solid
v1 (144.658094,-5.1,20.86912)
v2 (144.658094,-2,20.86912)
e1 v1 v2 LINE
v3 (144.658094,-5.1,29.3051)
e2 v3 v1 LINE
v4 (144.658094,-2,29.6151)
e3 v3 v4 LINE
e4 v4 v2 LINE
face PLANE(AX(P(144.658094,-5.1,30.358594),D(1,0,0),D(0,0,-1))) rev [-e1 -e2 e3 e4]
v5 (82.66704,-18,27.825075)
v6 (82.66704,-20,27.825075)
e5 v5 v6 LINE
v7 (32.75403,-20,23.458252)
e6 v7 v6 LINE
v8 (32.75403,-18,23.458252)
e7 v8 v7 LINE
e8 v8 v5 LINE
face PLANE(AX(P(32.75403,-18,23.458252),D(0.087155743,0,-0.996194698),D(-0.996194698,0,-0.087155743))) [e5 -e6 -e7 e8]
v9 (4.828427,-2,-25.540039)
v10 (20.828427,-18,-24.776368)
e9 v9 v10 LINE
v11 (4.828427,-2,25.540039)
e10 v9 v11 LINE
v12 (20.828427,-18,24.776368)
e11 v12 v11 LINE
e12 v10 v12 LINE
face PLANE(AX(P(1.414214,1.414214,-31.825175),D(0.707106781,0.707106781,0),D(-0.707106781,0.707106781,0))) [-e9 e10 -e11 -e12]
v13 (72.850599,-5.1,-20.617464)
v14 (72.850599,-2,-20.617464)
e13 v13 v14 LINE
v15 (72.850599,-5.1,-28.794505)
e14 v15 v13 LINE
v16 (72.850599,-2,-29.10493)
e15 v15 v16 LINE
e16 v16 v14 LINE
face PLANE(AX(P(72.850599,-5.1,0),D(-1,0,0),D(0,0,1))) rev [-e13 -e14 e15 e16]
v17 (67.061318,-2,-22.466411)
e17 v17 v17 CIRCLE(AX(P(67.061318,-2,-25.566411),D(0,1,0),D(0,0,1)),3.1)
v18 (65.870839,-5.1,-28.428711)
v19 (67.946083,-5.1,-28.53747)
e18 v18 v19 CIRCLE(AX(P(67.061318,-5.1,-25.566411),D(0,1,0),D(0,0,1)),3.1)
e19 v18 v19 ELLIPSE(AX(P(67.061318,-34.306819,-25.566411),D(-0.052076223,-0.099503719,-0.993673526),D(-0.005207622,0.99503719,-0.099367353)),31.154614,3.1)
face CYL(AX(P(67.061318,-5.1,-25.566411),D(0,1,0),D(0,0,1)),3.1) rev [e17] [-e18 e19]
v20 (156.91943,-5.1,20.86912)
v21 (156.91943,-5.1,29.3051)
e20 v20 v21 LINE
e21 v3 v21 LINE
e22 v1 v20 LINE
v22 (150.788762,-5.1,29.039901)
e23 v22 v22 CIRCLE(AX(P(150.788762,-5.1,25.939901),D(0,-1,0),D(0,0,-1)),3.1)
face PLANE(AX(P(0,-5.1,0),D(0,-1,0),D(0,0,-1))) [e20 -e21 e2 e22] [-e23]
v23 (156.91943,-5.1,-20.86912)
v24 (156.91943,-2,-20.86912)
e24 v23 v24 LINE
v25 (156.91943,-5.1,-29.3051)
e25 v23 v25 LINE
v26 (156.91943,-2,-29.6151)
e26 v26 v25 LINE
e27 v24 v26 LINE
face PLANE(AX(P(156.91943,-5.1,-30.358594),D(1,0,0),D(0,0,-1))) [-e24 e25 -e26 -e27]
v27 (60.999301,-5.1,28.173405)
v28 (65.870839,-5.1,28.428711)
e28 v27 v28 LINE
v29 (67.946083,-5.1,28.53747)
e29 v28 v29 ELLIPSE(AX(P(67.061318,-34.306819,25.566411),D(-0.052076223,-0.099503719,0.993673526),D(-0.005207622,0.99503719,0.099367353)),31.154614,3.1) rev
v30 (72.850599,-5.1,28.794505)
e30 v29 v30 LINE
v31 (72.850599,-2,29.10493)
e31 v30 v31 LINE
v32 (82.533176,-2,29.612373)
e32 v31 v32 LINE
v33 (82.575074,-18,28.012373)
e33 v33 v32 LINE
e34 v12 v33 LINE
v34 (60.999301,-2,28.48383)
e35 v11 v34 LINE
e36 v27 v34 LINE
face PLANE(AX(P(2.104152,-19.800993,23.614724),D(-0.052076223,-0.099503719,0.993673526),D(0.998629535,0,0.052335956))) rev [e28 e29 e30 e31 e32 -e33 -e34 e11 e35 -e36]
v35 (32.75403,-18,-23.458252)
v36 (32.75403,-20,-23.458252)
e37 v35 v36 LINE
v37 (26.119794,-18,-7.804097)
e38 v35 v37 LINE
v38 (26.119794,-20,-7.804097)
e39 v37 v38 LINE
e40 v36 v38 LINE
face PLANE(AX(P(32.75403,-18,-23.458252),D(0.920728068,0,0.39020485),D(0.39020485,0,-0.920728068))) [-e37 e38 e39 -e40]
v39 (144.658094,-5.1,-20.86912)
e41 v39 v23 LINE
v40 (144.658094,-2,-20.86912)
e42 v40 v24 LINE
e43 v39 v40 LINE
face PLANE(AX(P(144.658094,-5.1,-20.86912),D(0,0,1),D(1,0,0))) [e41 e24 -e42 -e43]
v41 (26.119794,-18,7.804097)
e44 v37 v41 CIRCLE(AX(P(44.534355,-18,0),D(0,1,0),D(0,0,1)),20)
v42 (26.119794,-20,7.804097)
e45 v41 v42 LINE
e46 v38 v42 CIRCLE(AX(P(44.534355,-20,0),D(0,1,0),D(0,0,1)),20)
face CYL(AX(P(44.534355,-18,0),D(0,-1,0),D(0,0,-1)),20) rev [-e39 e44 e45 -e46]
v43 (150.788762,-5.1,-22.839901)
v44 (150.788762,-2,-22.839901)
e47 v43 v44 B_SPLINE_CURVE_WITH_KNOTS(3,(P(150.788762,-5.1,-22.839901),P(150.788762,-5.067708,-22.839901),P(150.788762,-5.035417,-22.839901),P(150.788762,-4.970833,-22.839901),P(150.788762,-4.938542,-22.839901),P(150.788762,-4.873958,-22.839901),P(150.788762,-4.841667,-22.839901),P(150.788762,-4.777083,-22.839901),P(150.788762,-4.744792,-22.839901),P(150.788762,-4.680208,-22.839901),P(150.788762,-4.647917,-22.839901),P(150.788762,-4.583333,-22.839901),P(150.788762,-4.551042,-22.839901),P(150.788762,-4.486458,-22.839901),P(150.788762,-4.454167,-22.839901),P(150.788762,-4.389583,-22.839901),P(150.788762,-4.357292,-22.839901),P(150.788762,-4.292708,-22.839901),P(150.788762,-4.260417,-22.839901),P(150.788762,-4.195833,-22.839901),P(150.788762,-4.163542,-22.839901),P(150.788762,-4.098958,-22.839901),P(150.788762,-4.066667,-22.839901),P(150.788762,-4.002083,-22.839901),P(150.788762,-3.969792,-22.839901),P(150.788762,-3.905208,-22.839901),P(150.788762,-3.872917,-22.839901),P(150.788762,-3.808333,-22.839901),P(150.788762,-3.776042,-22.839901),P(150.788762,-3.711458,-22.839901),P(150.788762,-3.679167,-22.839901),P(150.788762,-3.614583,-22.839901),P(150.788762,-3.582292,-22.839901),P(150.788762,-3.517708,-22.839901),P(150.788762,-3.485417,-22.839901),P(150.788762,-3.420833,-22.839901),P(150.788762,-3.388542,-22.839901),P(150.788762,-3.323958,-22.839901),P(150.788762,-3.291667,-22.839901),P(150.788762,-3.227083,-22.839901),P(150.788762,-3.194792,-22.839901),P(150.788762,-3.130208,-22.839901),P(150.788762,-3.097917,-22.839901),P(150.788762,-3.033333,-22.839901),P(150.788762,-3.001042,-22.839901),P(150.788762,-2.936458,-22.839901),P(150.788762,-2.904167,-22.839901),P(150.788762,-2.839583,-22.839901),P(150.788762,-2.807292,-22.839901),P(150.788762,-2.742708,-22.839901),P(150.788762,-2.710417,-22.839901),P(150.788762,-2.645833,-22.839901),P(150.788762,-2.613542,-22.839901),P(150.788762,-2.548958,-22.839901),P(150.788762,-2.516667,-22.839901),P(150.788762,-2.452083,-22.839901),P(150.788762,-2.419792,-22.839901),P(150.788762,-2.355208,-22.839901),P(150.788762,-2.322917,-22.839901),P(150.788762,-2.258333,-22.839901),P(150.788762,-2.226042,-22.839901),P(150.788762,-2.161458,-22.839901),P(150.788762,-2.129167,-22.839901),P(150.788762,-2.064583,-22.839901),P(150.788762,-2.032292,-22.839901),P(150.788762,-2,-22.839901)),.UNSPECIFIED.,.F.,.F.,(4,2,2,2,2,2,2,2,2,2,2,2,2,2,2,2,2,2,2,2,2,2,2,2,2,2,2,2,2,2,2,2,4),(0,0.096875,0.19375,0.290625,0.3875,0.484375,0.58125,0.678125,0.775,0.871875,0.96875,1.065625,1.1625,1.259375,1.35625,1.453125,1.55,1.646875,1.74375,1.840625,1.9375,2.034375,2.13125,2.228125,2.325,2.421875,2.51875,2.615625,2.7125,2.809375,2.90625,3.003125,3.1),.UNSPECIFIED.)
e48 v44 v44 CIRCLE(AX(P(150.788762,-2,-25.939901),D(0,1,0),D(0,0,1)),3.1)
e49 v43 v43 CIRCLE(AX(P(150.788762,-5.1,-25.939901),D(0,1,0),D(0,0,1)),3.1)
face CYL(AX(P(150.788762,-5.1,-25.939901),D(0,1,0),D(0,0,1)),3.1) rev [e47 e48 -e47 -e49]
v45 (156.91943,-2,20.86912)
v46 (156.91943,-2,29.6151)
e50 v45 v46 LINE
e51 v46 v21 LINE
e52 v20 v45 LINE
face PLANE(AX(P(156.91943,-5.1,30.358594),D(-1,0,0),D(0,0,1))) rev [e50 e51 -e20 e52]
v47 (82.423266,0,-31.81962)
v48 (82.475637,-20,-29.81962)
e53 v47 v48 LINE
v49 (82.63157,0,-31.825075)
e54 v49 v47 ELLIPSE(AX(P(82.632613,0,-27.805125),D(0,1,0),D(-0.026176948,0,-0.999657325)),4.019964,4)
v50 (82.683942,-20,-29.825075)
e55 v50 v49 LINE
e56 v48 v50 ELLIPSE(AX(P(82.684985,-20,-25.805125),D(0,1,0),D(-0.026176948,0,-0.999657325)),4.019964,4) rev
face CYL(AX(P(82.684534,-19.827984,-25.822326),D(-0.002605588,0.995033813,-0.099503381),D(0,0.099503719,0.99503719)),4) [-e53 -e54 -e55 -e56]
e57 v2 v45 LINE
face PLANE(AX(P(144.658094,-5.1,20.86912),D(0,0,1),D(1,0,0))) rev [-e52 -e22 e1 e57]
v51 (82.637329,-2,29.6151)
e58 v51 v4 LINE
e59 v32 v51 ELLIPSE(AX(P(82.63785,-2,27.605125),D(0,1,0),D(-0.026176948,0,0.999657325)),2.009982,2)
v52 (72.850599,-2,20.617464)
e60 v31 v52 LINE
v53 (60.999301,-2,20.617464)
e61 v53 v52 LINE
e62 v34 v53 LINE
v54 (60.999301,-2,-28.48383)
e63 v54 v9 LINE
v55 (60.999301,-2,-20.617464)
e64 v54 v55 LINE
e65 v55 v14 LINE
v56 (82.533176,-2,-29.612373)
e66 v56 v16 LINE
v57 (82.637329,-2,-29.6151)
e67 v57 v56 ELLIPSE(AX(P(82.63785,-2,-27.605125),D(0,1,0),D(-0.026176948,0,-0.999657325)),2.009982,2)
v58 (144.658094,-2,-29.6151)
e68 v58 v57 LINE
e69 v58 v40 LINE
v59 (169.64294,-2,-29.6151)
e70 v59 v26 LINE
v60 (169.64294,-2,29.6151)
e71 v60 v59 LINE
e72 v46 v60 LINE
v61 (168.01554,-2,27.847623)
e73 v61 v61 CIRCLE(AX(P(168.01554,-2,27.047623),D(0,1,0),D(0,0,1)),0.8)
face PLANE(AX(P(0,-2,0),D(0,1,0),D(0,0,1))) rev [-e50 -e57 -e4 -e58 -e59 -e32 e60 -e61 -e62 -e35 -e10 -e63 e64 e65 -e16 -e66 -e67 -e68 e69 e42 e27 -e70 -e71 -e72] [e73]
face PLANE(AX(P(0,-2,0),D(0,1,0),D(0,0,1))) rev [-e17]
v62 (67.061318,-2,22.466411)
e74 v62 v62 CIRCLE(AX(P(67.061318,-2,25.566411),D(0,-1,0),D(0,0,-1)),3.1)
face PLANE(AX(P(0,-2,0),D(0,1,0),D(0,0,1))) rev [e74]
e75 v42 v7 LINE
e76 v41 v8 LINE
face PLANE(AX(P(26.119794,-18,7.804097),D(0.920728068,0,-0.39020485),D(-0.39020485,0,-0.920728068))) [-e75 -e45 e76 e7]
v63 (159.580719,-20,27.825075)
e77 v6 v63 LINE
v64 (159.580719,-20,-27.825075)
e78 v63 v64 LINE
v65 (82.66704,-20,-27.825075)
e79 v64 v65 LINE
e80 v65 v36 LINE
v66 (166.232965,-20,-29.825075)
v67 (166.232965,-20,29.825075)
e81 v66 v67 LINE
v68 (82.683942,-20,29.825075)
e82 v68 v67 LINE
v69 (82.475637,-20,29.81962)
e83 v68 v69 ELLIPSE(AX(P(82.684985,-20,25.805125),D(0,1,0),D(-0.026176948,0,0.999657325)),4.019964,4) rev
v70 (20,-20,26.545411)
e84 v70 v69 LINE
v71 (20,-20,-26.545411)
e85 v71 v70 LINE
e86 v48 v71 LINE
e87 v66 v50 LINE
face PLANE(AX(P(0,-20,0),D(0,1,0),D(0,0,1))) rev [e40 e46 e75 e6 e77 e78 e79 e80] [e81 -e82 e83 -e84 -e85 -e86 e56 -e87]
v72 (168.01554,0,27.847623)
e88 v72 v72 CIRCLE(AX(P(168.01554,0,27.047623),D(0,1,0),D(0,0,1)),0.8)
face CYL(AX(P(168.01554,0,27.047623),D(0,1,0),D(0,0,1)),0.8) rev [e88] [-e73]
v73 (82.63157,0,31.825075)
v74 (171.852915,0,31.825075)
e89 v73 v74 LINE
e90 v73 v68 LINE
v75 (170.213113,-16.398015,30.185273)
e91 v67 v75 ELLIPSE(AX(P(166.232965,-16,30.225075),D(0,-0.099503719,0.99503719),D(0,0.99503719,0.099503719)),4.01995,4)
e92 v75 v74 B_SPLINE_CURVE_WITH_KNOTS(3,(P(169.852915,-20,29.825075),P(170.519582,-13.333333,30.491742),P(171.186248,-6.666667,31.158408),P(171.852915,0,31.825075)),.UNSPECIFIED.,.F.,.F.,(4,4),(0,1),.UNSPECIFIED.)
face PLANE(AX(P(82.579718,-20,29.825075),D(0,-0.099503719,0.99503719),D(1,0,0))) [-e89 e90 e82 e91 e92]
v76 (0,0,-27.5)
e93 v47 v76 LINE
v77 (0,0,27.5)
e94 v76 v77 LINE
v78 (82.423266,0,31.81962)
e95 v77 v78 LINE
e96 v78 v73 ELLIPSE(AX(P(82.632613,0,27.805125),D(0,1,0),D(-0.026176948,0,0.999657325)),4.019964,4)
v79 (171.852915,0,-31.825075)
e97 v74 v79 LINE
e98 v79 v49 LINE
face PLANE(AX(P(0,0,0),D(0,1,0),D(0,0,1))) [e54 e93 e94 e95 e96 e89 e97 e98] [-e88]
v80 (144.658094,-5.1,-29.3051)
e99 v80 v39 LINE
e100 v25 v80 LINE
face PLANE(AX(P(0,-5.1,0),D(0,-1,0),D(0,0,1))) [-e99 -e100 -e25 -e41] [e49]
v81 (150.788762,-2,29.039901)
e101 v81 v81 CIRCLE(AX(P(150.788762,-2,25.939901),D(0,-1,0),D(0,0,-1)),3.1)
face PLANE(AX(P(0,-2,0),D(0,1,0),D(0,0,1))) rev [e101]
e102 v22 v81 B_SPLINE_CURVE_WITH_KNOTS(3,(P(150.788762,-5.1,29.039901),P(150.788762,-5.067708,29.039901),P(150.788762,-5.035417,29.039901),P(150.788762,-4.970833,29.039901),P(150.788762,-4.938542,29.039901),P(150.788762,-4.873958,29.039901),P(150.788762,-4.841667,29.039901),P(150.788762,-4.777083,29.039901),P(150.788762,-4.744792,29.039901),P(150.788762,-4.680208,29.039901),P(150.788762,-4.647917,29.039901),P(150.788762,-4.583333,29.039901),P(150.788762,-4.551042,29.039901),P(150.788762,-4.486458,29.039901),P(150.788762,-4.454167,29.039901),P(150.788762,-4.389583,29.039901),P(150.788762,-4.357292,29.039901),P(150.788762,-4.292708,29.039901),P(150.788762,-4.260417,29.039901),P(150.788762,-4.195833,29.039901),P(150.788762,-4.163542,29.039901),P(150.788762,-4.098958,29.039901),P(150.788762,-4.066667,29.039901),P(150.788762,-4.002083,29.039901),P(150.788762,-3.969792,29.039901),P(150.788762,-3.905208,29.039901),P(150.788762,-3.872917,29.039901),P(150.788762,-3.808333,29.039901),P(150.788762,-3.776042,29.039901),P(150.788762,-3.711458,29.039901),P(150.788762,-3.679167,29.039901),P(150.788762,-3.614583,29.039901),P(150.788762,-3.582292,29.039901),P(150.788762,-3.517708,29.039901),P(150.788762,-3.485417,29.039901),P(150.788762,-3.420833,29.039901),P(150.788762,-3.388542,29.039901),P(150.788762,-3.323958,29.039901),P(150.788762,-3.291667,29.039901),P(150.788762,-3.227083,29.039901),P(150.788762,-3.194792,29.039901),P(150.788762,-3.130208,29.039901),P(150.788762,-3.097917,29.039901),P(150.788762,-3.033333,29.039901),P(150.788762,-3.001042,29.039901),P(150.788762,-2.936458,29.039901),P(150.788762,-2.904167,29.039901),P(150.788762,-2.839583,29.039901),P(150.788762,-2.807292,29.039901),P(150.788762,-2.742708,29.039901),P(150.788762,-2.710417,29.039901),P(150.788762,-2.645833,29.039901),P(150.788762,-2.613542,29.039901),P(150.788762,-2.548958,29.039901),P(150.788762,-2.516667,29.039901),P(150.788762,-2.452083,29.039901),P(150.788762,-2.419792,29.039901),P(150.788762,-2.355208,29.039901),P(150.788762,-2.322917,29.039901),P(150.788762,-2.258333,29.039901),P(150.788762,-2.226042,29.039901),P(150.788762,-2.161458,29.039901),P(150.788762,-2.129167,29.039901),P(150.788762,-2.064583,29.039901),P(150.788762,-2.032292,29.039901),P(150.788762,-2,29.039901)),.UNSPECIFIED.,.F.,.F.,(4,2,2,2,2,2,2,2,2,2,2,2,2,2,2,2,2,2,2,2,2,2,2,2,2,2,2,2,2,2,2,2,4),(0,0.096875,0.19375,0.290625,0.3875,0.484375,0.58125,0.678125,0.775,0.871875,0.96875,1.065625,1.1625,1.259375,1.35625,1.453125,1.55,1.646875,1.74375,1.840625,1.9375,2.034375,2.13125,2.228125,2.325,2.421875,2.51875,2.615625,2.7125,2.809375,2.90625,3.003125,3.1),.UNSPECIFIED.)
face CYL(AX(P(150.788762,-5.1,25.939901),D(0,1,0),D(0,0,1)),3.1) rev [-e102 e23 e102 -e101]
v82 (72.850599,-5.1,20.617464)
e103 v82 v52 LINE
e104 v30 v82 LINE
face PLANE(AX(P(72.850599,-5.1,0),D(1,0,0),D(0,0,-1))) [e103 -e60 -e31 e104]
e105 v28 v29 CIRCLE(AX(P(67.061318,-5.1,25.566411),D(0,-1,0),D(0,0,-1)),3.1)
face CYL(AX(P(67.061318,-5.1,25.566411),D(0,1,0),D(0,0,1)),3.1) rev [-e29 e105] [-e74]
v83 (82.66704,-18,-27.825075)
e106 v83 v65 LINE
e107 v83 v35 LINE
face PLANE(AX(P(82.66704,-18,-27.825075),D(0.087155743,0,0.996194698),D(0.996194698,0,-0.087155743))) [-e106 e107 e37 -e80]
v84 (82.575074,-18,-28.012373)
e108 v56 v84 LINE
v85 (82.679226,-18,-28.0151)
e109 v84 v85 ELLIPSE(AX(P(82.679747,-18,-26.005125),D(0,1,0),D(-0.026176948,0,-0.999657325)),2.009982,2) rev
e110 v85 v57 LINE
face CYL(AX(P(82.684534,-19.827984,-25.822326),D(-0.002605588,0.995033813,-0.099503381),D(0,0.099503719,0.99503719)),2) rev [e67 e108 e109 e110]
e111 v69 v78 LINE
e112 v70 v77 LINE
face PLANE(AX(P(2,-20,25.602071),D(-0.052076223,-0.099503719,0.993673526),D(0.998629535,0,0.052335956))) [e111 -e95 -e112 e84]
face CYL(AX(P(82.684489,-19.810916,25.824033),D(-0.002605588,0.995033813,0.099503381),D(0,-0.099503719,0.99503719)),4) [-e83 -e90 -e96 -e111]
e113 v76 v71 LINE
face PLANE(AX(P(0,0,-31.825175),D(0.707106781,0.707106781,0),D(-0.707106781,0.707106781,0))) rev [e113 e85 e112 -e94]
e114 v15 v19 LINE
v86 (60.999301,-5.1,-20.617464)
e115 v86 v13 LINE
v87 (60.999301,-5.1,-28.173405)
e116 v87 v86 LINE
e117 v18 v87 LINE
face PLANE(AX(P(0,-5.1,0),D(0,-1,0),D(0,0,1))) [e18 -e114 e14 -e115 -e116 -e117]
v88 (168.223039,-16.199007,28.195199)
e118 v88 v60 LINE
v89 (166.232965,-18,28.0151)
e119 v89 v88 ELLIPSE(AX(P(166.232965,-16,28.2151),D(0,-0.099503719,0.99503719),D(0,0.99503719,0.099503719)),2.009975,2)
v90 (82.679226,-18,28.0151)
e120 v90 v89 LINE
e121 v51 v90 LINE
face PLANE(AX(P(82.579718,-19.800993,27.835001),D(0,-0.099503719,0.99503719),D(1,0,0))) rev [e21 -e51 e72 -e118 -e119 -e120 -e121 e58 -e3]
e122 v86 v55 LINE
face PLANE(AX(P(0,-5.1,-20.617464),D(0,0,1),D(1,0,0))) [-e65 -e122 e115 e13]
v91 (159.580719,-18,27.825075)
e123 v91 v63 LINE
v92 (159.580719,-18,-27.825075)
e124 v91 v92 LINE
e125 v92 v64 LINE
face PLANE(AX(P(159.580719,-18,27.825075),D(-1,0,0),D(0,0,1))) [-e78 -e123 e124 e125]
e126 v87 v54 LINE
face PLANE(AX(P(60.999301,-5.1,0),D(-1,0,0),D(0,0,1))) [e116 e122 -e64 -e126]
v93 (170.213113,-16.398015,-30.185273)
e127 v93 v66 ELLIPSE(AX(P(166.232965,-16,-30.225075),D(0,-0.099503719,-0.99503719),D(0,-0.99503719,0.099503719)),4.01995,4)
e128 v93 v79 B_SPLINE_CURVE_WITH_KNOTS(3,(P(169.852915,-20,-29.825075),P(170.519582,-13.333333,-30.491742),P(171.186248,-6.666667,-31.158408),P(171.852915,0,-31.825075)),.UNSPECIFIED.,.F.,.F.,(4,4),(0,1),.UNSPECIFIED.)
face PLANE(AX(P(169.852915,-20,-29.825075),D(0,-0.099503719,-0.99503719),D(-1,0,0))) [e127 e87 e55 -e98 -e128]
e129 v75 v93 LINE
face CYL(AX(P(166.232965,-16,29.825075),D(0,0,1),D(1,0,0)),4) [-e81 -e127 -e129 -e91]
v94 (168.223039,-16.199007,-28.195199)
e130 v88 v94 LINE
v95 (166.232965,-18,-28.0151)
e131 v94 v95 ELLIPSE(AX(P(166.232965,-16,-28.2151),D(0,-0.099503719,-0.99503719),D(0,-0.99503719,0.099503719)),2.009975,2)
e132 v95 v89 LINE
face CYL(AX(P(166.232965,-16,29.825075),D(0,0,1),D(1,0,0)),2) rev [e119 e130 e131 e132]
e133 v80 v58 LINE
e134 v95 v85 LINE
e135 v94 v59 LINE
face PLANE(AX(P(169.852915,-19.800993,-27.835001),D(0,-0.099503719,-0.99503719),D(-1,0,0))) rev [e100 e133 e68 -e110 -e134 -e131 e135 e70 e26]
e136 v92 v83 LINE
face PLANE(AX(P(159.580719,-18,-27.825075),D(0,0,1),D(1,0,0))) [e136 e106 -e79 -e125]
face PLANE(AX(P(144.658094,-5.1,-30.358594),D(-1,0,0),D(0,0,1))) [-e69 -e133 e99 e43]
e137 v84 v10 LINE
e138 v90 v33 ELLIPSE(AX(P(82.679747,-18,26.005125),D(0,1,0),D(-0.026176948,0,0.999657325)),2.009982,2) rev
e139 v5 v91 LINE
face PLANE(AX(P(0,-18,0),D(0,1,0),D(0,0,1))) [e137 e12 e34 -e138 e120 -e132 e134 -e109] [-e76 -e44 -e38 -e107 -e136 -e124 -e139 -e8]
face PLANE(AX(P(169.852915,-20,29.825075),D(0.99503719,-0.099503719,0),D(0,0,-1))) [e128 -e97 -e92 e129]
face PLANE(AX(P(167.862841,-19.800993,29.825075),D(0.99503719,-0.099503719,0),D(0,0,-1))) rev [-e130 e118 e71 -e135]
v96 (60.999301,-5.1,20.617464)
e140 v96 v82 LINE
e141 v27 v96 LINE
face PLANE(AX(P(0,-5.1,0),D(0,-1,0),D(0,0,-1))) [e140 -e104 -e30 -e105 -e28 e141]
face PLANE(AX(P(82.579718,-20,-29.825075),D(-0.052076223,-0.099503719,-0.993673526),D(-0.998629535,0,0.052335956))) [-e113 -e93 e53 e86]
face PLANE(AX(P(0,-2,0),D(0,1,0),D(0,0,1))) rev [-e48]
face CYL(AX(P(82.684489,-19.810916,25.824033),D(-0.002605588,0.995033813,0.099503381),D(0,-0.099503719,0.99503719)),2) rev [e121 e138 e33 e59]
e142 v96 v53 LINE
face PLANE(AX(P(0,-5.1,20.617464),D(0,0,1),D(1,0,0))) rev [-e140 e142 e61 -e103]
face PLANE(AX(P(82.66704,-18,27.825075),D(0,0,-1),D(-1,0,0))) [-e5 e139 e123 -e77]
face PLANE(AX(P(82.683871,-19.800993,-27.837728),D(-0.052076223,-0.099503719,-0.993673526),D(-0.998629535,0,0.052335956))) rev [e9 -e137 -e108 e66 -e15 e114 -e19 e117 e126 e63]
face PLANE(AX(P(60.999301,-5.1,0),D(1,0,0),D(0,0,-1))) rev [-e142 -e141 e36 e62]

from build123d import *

# Parameters (mm, degrees)
LOFT_2_DEPTH             = 20
LOFT_2_DRAFT             = -5.7105931
CUT_EXTRUDE_8_DEPTH      = 176.915490387
CUT_EXTRUDE_8_DEPTH_BACK = 176.915490387
FILLET_1_R               = 4
SHELL_1_T                = 2
CUT_EXTRUDE_9_DEPTH      = 2
SKETCH_15_R              = 3.1
EXTRUDE_2_DEPTH          = 3.1
SKETCH_16_W              = 12.261336097
SKETCH_16_H              = 9.48947362
SKETCH_16_R              = 3.1
EXTRUDE_3_DEPTH          = 3.1
HOLE_WIZARD_M2_1_D       = 1.6
HOLE_WIZARD_M2_1_DEPTH   = 2


# Read off the part's stored shape, not the designer's step: 放样2
with BuildPart() as part:
    # 放样2 outline → 放样2 (with draft: the straight prism first)
    with BuildSketch(Plane(origin=(0, -20, 0), x_dir=(1, 0, 0), z_dir=(0, 1, 0))):
        Polygon((2, -25.602070867), (82.579718414, -29.825074964), (169.852914921, -29.825074964), (169.852914921, 29.825074964), (82.579718414, 29.825074964), (2, 25.602070867), align=None)
    extrude(amount=LOFT_2_DEPTH)
    # 放样2: the draft: its side faces are tilted about the plane it starts from
    loft_2_sides = [part.faces().sort_by_distance(p)[0] for p in [
        (42.289859207, -10, 27.713572915),
        (126.216316668, -10, 29.825074964),
        (169.852914921, -10, 0),
        (126.216316667, -10, -29.825074964),
        (42.289859207, -10, -27.713572915),
        (2, -10, 0),
    ]]
    draft(loft_2_sides, Plane(origin=(0, -20, 0), x_dir=(1, 0, 0), z_dir=(0, 1, 0)), LOFT_2_DRAFT)

    # 草图8 → 切除-拉伸8 (cut, two sides: drawn at the far end of the back side and taken through both)
    with BuildSketch(Plane.XY.offset(-CUT_EXTRUDE_8_DEPTH_BACK)):
        Polygon((0, 0), (20, -20), (-19.267413558, -20), align=None)
    extrude(amount=CUT_EXTRUDE_8_DEPTH + CUT_EXTRUDE_8_DEPTH_BACK, mode=Mode.SUBTRACT)

    # 圆角1
    # the kernel refuses this fillet: 4 mm, written as the material it takes off along each edge
    with BuildSketch(Plane(origin=(82.580397323, -20.25926479, -29.799148485), x_dir=(-0.9986397137740413, 0.0025926566839660006, 0.0520768682297623), z_dir=(-0.002605587720042804, 0.9950338125721717, -0.09950338059946291))) as fillet_1_piece_1:
        with BuildLine():
            CenterArc((FILLET_1_R * 0.0260558773727, FILLET_1_R), FILLET_1_R, 267.014891807, 2.985108193)
            Line((-FILLET_1_R * 0.0260205222495, FILLET_1_R * 0.00135689628257), (0, 0))
            Line((0, 0), (FILLET_1_R * 0.0260558773727, 0))
        make_face()
    extrude(amount=20.620937018, mode=Mode.SUBTRACT)
    with BuildSketch(Plane(origin=(82.580397323, -20.25926479, 29.799148485), x_dir=(-0.9986397137740393, 0.002592656683969708, -0.05207686822979932), z_dir=(-0.002605587720042804, 0.9950338125721717, 0.09950338059946291))) as fillet_1_piece_2:
        with BuildLine():
            CenterArc((FILLET_1_R * 0.0260558773727, -FILLET_1_R), FILLET_1_R, 90, 2.985108193)
            Line((-FILLET_1_R * 0.0260205222495, -FILLET_1_R * 0.00135689628257), (0, 0))
            Line((0, 0), (FILLET_1_R * 0.0260558773727, 0))
        make_face()
    extrude(amount=20.620937018, mode=Mode.SUBTRACT)
    with BuildSketch(Plane(origin=(169.852914921, -20, 38.874950591), x_dir=(-1, 0, 0), z_dir=(0, 0, -1))) as fillet_1_piece_3:
        with BuildLine():
            CenterArc((FILLET_1_R * 0.904987562707, FILLET_1_R), FILLET_1_R, 185.7105931, 84.2894069)
            Line((-FILLET_1_R * 0.0900496275678, FILLET_1_R * 0.90049628163), (0, 0))
            Line((0, 0), (FILLET_1_R * 0.904987562707, 0))
        make_face()
    extrude(amount=77.749901182, mode=Mode.SUBTRACT)

    # 抽壳1 (no face opened: a closed hollow body)
    add(offset(amount=-SHELL_1_T, mode=Mode.PRIVATE), mode=Mode.SUBTRACT)

    # 草图11 → 切除-拉伸9 (cut)
    with BuildSketch(Plane(origin=(0, -20, 0), x_dir=(1, 0, 0), z_dir=(0, 1, 0))):
        with BuildLine():
            Line((32.7540299, 23.458252391), (26.119793836, 7.804096994))
            ThreePointArc((26.119793836, 7.804096994), (24.534355196, 0), (26.119793836, -7.804096994))
            Line((26.119793836, -7.804096994), (32.7540299, -23.458252391))
            Line((32.7540299, -23.458252391), (82.6670403, -27.825074964))
            Line((82.6670403, -27.825074964), (159.58071917, -27.825074964))
            Line((159.58071917, -27.825074964), (159.58071917, 27.825074964))
            Line((159.58071917, 27.825074964), (82.6670403, 27.825074964))
            Line((82.6670403, 27.825074964), (32.7540299, 23.458252391))
        make_face()
    extrude(amount=CUT_EXTRUDE_9_DEPTH, mode=Mode.SUBTRACT)

    # 草图15 → 凸台-拉伸2 (add)
    with BuildSketch(Plane.XZ.offset(2)):
        Polygon((72.850599149, 29.104930146), (60.999300983, 28.483829928), (60.999300983, 20.617464002), (72.850599149, 20.617464002), align=None)
        with Locations(Location((67.061317629, 25.566411224, 0), (0, 0, 73.416746399))):
            Circle(SKETCH_15_R, mode=Mode.SUBTRACT)
    extrude_2 = extrude(amount=EXTRUDE_2_DEPTH)

    # 镜向1: 凸台-拉伸2 across plane
    add(extrude_2.mirror(Plane(origin=(0, 0, 0), x_dir=(1, 0, 0), z_dir=(0, 0, -1))))

    # 草图16 → 凸台-拉伸3 (add)
    with BuildSketch(Plane.XZ.offset(2)):
        with Locations((150.788762168, 25.613857156)):
            Rectangle(SKETCH_16_W, SKETCH_16_H)
        with Locations(Location((150.788762168, 25.939901438, 0), (0, 0, 90))):
            Circle(SKETCH_16_R, mode=Mode.SUBTRACT)
    extrude_3 = extrude(amount=EXTRUDE_3_DEPTH)

    # 镜向2: 凸台-拉伸3 across plane
    add(extrude_3.mirror(Plane(origin=(0, 0, 0), x_dir=(1, 0, 0), z_dir=(0, 0, -1))))

    # M2 螺纹孔1
    with Locations(Plane(origin=(0, 0, 0), x_dir=(1, 0, 0), z_dir=(0, 1, 0))):
        with Locations((168.015540482, -27.047622993)):
            Hole(HOLE_WIZARD_M2_1_D / 2, depth=HOLE_WIZARD_M2_1_DEPTH)


solid = part.part
